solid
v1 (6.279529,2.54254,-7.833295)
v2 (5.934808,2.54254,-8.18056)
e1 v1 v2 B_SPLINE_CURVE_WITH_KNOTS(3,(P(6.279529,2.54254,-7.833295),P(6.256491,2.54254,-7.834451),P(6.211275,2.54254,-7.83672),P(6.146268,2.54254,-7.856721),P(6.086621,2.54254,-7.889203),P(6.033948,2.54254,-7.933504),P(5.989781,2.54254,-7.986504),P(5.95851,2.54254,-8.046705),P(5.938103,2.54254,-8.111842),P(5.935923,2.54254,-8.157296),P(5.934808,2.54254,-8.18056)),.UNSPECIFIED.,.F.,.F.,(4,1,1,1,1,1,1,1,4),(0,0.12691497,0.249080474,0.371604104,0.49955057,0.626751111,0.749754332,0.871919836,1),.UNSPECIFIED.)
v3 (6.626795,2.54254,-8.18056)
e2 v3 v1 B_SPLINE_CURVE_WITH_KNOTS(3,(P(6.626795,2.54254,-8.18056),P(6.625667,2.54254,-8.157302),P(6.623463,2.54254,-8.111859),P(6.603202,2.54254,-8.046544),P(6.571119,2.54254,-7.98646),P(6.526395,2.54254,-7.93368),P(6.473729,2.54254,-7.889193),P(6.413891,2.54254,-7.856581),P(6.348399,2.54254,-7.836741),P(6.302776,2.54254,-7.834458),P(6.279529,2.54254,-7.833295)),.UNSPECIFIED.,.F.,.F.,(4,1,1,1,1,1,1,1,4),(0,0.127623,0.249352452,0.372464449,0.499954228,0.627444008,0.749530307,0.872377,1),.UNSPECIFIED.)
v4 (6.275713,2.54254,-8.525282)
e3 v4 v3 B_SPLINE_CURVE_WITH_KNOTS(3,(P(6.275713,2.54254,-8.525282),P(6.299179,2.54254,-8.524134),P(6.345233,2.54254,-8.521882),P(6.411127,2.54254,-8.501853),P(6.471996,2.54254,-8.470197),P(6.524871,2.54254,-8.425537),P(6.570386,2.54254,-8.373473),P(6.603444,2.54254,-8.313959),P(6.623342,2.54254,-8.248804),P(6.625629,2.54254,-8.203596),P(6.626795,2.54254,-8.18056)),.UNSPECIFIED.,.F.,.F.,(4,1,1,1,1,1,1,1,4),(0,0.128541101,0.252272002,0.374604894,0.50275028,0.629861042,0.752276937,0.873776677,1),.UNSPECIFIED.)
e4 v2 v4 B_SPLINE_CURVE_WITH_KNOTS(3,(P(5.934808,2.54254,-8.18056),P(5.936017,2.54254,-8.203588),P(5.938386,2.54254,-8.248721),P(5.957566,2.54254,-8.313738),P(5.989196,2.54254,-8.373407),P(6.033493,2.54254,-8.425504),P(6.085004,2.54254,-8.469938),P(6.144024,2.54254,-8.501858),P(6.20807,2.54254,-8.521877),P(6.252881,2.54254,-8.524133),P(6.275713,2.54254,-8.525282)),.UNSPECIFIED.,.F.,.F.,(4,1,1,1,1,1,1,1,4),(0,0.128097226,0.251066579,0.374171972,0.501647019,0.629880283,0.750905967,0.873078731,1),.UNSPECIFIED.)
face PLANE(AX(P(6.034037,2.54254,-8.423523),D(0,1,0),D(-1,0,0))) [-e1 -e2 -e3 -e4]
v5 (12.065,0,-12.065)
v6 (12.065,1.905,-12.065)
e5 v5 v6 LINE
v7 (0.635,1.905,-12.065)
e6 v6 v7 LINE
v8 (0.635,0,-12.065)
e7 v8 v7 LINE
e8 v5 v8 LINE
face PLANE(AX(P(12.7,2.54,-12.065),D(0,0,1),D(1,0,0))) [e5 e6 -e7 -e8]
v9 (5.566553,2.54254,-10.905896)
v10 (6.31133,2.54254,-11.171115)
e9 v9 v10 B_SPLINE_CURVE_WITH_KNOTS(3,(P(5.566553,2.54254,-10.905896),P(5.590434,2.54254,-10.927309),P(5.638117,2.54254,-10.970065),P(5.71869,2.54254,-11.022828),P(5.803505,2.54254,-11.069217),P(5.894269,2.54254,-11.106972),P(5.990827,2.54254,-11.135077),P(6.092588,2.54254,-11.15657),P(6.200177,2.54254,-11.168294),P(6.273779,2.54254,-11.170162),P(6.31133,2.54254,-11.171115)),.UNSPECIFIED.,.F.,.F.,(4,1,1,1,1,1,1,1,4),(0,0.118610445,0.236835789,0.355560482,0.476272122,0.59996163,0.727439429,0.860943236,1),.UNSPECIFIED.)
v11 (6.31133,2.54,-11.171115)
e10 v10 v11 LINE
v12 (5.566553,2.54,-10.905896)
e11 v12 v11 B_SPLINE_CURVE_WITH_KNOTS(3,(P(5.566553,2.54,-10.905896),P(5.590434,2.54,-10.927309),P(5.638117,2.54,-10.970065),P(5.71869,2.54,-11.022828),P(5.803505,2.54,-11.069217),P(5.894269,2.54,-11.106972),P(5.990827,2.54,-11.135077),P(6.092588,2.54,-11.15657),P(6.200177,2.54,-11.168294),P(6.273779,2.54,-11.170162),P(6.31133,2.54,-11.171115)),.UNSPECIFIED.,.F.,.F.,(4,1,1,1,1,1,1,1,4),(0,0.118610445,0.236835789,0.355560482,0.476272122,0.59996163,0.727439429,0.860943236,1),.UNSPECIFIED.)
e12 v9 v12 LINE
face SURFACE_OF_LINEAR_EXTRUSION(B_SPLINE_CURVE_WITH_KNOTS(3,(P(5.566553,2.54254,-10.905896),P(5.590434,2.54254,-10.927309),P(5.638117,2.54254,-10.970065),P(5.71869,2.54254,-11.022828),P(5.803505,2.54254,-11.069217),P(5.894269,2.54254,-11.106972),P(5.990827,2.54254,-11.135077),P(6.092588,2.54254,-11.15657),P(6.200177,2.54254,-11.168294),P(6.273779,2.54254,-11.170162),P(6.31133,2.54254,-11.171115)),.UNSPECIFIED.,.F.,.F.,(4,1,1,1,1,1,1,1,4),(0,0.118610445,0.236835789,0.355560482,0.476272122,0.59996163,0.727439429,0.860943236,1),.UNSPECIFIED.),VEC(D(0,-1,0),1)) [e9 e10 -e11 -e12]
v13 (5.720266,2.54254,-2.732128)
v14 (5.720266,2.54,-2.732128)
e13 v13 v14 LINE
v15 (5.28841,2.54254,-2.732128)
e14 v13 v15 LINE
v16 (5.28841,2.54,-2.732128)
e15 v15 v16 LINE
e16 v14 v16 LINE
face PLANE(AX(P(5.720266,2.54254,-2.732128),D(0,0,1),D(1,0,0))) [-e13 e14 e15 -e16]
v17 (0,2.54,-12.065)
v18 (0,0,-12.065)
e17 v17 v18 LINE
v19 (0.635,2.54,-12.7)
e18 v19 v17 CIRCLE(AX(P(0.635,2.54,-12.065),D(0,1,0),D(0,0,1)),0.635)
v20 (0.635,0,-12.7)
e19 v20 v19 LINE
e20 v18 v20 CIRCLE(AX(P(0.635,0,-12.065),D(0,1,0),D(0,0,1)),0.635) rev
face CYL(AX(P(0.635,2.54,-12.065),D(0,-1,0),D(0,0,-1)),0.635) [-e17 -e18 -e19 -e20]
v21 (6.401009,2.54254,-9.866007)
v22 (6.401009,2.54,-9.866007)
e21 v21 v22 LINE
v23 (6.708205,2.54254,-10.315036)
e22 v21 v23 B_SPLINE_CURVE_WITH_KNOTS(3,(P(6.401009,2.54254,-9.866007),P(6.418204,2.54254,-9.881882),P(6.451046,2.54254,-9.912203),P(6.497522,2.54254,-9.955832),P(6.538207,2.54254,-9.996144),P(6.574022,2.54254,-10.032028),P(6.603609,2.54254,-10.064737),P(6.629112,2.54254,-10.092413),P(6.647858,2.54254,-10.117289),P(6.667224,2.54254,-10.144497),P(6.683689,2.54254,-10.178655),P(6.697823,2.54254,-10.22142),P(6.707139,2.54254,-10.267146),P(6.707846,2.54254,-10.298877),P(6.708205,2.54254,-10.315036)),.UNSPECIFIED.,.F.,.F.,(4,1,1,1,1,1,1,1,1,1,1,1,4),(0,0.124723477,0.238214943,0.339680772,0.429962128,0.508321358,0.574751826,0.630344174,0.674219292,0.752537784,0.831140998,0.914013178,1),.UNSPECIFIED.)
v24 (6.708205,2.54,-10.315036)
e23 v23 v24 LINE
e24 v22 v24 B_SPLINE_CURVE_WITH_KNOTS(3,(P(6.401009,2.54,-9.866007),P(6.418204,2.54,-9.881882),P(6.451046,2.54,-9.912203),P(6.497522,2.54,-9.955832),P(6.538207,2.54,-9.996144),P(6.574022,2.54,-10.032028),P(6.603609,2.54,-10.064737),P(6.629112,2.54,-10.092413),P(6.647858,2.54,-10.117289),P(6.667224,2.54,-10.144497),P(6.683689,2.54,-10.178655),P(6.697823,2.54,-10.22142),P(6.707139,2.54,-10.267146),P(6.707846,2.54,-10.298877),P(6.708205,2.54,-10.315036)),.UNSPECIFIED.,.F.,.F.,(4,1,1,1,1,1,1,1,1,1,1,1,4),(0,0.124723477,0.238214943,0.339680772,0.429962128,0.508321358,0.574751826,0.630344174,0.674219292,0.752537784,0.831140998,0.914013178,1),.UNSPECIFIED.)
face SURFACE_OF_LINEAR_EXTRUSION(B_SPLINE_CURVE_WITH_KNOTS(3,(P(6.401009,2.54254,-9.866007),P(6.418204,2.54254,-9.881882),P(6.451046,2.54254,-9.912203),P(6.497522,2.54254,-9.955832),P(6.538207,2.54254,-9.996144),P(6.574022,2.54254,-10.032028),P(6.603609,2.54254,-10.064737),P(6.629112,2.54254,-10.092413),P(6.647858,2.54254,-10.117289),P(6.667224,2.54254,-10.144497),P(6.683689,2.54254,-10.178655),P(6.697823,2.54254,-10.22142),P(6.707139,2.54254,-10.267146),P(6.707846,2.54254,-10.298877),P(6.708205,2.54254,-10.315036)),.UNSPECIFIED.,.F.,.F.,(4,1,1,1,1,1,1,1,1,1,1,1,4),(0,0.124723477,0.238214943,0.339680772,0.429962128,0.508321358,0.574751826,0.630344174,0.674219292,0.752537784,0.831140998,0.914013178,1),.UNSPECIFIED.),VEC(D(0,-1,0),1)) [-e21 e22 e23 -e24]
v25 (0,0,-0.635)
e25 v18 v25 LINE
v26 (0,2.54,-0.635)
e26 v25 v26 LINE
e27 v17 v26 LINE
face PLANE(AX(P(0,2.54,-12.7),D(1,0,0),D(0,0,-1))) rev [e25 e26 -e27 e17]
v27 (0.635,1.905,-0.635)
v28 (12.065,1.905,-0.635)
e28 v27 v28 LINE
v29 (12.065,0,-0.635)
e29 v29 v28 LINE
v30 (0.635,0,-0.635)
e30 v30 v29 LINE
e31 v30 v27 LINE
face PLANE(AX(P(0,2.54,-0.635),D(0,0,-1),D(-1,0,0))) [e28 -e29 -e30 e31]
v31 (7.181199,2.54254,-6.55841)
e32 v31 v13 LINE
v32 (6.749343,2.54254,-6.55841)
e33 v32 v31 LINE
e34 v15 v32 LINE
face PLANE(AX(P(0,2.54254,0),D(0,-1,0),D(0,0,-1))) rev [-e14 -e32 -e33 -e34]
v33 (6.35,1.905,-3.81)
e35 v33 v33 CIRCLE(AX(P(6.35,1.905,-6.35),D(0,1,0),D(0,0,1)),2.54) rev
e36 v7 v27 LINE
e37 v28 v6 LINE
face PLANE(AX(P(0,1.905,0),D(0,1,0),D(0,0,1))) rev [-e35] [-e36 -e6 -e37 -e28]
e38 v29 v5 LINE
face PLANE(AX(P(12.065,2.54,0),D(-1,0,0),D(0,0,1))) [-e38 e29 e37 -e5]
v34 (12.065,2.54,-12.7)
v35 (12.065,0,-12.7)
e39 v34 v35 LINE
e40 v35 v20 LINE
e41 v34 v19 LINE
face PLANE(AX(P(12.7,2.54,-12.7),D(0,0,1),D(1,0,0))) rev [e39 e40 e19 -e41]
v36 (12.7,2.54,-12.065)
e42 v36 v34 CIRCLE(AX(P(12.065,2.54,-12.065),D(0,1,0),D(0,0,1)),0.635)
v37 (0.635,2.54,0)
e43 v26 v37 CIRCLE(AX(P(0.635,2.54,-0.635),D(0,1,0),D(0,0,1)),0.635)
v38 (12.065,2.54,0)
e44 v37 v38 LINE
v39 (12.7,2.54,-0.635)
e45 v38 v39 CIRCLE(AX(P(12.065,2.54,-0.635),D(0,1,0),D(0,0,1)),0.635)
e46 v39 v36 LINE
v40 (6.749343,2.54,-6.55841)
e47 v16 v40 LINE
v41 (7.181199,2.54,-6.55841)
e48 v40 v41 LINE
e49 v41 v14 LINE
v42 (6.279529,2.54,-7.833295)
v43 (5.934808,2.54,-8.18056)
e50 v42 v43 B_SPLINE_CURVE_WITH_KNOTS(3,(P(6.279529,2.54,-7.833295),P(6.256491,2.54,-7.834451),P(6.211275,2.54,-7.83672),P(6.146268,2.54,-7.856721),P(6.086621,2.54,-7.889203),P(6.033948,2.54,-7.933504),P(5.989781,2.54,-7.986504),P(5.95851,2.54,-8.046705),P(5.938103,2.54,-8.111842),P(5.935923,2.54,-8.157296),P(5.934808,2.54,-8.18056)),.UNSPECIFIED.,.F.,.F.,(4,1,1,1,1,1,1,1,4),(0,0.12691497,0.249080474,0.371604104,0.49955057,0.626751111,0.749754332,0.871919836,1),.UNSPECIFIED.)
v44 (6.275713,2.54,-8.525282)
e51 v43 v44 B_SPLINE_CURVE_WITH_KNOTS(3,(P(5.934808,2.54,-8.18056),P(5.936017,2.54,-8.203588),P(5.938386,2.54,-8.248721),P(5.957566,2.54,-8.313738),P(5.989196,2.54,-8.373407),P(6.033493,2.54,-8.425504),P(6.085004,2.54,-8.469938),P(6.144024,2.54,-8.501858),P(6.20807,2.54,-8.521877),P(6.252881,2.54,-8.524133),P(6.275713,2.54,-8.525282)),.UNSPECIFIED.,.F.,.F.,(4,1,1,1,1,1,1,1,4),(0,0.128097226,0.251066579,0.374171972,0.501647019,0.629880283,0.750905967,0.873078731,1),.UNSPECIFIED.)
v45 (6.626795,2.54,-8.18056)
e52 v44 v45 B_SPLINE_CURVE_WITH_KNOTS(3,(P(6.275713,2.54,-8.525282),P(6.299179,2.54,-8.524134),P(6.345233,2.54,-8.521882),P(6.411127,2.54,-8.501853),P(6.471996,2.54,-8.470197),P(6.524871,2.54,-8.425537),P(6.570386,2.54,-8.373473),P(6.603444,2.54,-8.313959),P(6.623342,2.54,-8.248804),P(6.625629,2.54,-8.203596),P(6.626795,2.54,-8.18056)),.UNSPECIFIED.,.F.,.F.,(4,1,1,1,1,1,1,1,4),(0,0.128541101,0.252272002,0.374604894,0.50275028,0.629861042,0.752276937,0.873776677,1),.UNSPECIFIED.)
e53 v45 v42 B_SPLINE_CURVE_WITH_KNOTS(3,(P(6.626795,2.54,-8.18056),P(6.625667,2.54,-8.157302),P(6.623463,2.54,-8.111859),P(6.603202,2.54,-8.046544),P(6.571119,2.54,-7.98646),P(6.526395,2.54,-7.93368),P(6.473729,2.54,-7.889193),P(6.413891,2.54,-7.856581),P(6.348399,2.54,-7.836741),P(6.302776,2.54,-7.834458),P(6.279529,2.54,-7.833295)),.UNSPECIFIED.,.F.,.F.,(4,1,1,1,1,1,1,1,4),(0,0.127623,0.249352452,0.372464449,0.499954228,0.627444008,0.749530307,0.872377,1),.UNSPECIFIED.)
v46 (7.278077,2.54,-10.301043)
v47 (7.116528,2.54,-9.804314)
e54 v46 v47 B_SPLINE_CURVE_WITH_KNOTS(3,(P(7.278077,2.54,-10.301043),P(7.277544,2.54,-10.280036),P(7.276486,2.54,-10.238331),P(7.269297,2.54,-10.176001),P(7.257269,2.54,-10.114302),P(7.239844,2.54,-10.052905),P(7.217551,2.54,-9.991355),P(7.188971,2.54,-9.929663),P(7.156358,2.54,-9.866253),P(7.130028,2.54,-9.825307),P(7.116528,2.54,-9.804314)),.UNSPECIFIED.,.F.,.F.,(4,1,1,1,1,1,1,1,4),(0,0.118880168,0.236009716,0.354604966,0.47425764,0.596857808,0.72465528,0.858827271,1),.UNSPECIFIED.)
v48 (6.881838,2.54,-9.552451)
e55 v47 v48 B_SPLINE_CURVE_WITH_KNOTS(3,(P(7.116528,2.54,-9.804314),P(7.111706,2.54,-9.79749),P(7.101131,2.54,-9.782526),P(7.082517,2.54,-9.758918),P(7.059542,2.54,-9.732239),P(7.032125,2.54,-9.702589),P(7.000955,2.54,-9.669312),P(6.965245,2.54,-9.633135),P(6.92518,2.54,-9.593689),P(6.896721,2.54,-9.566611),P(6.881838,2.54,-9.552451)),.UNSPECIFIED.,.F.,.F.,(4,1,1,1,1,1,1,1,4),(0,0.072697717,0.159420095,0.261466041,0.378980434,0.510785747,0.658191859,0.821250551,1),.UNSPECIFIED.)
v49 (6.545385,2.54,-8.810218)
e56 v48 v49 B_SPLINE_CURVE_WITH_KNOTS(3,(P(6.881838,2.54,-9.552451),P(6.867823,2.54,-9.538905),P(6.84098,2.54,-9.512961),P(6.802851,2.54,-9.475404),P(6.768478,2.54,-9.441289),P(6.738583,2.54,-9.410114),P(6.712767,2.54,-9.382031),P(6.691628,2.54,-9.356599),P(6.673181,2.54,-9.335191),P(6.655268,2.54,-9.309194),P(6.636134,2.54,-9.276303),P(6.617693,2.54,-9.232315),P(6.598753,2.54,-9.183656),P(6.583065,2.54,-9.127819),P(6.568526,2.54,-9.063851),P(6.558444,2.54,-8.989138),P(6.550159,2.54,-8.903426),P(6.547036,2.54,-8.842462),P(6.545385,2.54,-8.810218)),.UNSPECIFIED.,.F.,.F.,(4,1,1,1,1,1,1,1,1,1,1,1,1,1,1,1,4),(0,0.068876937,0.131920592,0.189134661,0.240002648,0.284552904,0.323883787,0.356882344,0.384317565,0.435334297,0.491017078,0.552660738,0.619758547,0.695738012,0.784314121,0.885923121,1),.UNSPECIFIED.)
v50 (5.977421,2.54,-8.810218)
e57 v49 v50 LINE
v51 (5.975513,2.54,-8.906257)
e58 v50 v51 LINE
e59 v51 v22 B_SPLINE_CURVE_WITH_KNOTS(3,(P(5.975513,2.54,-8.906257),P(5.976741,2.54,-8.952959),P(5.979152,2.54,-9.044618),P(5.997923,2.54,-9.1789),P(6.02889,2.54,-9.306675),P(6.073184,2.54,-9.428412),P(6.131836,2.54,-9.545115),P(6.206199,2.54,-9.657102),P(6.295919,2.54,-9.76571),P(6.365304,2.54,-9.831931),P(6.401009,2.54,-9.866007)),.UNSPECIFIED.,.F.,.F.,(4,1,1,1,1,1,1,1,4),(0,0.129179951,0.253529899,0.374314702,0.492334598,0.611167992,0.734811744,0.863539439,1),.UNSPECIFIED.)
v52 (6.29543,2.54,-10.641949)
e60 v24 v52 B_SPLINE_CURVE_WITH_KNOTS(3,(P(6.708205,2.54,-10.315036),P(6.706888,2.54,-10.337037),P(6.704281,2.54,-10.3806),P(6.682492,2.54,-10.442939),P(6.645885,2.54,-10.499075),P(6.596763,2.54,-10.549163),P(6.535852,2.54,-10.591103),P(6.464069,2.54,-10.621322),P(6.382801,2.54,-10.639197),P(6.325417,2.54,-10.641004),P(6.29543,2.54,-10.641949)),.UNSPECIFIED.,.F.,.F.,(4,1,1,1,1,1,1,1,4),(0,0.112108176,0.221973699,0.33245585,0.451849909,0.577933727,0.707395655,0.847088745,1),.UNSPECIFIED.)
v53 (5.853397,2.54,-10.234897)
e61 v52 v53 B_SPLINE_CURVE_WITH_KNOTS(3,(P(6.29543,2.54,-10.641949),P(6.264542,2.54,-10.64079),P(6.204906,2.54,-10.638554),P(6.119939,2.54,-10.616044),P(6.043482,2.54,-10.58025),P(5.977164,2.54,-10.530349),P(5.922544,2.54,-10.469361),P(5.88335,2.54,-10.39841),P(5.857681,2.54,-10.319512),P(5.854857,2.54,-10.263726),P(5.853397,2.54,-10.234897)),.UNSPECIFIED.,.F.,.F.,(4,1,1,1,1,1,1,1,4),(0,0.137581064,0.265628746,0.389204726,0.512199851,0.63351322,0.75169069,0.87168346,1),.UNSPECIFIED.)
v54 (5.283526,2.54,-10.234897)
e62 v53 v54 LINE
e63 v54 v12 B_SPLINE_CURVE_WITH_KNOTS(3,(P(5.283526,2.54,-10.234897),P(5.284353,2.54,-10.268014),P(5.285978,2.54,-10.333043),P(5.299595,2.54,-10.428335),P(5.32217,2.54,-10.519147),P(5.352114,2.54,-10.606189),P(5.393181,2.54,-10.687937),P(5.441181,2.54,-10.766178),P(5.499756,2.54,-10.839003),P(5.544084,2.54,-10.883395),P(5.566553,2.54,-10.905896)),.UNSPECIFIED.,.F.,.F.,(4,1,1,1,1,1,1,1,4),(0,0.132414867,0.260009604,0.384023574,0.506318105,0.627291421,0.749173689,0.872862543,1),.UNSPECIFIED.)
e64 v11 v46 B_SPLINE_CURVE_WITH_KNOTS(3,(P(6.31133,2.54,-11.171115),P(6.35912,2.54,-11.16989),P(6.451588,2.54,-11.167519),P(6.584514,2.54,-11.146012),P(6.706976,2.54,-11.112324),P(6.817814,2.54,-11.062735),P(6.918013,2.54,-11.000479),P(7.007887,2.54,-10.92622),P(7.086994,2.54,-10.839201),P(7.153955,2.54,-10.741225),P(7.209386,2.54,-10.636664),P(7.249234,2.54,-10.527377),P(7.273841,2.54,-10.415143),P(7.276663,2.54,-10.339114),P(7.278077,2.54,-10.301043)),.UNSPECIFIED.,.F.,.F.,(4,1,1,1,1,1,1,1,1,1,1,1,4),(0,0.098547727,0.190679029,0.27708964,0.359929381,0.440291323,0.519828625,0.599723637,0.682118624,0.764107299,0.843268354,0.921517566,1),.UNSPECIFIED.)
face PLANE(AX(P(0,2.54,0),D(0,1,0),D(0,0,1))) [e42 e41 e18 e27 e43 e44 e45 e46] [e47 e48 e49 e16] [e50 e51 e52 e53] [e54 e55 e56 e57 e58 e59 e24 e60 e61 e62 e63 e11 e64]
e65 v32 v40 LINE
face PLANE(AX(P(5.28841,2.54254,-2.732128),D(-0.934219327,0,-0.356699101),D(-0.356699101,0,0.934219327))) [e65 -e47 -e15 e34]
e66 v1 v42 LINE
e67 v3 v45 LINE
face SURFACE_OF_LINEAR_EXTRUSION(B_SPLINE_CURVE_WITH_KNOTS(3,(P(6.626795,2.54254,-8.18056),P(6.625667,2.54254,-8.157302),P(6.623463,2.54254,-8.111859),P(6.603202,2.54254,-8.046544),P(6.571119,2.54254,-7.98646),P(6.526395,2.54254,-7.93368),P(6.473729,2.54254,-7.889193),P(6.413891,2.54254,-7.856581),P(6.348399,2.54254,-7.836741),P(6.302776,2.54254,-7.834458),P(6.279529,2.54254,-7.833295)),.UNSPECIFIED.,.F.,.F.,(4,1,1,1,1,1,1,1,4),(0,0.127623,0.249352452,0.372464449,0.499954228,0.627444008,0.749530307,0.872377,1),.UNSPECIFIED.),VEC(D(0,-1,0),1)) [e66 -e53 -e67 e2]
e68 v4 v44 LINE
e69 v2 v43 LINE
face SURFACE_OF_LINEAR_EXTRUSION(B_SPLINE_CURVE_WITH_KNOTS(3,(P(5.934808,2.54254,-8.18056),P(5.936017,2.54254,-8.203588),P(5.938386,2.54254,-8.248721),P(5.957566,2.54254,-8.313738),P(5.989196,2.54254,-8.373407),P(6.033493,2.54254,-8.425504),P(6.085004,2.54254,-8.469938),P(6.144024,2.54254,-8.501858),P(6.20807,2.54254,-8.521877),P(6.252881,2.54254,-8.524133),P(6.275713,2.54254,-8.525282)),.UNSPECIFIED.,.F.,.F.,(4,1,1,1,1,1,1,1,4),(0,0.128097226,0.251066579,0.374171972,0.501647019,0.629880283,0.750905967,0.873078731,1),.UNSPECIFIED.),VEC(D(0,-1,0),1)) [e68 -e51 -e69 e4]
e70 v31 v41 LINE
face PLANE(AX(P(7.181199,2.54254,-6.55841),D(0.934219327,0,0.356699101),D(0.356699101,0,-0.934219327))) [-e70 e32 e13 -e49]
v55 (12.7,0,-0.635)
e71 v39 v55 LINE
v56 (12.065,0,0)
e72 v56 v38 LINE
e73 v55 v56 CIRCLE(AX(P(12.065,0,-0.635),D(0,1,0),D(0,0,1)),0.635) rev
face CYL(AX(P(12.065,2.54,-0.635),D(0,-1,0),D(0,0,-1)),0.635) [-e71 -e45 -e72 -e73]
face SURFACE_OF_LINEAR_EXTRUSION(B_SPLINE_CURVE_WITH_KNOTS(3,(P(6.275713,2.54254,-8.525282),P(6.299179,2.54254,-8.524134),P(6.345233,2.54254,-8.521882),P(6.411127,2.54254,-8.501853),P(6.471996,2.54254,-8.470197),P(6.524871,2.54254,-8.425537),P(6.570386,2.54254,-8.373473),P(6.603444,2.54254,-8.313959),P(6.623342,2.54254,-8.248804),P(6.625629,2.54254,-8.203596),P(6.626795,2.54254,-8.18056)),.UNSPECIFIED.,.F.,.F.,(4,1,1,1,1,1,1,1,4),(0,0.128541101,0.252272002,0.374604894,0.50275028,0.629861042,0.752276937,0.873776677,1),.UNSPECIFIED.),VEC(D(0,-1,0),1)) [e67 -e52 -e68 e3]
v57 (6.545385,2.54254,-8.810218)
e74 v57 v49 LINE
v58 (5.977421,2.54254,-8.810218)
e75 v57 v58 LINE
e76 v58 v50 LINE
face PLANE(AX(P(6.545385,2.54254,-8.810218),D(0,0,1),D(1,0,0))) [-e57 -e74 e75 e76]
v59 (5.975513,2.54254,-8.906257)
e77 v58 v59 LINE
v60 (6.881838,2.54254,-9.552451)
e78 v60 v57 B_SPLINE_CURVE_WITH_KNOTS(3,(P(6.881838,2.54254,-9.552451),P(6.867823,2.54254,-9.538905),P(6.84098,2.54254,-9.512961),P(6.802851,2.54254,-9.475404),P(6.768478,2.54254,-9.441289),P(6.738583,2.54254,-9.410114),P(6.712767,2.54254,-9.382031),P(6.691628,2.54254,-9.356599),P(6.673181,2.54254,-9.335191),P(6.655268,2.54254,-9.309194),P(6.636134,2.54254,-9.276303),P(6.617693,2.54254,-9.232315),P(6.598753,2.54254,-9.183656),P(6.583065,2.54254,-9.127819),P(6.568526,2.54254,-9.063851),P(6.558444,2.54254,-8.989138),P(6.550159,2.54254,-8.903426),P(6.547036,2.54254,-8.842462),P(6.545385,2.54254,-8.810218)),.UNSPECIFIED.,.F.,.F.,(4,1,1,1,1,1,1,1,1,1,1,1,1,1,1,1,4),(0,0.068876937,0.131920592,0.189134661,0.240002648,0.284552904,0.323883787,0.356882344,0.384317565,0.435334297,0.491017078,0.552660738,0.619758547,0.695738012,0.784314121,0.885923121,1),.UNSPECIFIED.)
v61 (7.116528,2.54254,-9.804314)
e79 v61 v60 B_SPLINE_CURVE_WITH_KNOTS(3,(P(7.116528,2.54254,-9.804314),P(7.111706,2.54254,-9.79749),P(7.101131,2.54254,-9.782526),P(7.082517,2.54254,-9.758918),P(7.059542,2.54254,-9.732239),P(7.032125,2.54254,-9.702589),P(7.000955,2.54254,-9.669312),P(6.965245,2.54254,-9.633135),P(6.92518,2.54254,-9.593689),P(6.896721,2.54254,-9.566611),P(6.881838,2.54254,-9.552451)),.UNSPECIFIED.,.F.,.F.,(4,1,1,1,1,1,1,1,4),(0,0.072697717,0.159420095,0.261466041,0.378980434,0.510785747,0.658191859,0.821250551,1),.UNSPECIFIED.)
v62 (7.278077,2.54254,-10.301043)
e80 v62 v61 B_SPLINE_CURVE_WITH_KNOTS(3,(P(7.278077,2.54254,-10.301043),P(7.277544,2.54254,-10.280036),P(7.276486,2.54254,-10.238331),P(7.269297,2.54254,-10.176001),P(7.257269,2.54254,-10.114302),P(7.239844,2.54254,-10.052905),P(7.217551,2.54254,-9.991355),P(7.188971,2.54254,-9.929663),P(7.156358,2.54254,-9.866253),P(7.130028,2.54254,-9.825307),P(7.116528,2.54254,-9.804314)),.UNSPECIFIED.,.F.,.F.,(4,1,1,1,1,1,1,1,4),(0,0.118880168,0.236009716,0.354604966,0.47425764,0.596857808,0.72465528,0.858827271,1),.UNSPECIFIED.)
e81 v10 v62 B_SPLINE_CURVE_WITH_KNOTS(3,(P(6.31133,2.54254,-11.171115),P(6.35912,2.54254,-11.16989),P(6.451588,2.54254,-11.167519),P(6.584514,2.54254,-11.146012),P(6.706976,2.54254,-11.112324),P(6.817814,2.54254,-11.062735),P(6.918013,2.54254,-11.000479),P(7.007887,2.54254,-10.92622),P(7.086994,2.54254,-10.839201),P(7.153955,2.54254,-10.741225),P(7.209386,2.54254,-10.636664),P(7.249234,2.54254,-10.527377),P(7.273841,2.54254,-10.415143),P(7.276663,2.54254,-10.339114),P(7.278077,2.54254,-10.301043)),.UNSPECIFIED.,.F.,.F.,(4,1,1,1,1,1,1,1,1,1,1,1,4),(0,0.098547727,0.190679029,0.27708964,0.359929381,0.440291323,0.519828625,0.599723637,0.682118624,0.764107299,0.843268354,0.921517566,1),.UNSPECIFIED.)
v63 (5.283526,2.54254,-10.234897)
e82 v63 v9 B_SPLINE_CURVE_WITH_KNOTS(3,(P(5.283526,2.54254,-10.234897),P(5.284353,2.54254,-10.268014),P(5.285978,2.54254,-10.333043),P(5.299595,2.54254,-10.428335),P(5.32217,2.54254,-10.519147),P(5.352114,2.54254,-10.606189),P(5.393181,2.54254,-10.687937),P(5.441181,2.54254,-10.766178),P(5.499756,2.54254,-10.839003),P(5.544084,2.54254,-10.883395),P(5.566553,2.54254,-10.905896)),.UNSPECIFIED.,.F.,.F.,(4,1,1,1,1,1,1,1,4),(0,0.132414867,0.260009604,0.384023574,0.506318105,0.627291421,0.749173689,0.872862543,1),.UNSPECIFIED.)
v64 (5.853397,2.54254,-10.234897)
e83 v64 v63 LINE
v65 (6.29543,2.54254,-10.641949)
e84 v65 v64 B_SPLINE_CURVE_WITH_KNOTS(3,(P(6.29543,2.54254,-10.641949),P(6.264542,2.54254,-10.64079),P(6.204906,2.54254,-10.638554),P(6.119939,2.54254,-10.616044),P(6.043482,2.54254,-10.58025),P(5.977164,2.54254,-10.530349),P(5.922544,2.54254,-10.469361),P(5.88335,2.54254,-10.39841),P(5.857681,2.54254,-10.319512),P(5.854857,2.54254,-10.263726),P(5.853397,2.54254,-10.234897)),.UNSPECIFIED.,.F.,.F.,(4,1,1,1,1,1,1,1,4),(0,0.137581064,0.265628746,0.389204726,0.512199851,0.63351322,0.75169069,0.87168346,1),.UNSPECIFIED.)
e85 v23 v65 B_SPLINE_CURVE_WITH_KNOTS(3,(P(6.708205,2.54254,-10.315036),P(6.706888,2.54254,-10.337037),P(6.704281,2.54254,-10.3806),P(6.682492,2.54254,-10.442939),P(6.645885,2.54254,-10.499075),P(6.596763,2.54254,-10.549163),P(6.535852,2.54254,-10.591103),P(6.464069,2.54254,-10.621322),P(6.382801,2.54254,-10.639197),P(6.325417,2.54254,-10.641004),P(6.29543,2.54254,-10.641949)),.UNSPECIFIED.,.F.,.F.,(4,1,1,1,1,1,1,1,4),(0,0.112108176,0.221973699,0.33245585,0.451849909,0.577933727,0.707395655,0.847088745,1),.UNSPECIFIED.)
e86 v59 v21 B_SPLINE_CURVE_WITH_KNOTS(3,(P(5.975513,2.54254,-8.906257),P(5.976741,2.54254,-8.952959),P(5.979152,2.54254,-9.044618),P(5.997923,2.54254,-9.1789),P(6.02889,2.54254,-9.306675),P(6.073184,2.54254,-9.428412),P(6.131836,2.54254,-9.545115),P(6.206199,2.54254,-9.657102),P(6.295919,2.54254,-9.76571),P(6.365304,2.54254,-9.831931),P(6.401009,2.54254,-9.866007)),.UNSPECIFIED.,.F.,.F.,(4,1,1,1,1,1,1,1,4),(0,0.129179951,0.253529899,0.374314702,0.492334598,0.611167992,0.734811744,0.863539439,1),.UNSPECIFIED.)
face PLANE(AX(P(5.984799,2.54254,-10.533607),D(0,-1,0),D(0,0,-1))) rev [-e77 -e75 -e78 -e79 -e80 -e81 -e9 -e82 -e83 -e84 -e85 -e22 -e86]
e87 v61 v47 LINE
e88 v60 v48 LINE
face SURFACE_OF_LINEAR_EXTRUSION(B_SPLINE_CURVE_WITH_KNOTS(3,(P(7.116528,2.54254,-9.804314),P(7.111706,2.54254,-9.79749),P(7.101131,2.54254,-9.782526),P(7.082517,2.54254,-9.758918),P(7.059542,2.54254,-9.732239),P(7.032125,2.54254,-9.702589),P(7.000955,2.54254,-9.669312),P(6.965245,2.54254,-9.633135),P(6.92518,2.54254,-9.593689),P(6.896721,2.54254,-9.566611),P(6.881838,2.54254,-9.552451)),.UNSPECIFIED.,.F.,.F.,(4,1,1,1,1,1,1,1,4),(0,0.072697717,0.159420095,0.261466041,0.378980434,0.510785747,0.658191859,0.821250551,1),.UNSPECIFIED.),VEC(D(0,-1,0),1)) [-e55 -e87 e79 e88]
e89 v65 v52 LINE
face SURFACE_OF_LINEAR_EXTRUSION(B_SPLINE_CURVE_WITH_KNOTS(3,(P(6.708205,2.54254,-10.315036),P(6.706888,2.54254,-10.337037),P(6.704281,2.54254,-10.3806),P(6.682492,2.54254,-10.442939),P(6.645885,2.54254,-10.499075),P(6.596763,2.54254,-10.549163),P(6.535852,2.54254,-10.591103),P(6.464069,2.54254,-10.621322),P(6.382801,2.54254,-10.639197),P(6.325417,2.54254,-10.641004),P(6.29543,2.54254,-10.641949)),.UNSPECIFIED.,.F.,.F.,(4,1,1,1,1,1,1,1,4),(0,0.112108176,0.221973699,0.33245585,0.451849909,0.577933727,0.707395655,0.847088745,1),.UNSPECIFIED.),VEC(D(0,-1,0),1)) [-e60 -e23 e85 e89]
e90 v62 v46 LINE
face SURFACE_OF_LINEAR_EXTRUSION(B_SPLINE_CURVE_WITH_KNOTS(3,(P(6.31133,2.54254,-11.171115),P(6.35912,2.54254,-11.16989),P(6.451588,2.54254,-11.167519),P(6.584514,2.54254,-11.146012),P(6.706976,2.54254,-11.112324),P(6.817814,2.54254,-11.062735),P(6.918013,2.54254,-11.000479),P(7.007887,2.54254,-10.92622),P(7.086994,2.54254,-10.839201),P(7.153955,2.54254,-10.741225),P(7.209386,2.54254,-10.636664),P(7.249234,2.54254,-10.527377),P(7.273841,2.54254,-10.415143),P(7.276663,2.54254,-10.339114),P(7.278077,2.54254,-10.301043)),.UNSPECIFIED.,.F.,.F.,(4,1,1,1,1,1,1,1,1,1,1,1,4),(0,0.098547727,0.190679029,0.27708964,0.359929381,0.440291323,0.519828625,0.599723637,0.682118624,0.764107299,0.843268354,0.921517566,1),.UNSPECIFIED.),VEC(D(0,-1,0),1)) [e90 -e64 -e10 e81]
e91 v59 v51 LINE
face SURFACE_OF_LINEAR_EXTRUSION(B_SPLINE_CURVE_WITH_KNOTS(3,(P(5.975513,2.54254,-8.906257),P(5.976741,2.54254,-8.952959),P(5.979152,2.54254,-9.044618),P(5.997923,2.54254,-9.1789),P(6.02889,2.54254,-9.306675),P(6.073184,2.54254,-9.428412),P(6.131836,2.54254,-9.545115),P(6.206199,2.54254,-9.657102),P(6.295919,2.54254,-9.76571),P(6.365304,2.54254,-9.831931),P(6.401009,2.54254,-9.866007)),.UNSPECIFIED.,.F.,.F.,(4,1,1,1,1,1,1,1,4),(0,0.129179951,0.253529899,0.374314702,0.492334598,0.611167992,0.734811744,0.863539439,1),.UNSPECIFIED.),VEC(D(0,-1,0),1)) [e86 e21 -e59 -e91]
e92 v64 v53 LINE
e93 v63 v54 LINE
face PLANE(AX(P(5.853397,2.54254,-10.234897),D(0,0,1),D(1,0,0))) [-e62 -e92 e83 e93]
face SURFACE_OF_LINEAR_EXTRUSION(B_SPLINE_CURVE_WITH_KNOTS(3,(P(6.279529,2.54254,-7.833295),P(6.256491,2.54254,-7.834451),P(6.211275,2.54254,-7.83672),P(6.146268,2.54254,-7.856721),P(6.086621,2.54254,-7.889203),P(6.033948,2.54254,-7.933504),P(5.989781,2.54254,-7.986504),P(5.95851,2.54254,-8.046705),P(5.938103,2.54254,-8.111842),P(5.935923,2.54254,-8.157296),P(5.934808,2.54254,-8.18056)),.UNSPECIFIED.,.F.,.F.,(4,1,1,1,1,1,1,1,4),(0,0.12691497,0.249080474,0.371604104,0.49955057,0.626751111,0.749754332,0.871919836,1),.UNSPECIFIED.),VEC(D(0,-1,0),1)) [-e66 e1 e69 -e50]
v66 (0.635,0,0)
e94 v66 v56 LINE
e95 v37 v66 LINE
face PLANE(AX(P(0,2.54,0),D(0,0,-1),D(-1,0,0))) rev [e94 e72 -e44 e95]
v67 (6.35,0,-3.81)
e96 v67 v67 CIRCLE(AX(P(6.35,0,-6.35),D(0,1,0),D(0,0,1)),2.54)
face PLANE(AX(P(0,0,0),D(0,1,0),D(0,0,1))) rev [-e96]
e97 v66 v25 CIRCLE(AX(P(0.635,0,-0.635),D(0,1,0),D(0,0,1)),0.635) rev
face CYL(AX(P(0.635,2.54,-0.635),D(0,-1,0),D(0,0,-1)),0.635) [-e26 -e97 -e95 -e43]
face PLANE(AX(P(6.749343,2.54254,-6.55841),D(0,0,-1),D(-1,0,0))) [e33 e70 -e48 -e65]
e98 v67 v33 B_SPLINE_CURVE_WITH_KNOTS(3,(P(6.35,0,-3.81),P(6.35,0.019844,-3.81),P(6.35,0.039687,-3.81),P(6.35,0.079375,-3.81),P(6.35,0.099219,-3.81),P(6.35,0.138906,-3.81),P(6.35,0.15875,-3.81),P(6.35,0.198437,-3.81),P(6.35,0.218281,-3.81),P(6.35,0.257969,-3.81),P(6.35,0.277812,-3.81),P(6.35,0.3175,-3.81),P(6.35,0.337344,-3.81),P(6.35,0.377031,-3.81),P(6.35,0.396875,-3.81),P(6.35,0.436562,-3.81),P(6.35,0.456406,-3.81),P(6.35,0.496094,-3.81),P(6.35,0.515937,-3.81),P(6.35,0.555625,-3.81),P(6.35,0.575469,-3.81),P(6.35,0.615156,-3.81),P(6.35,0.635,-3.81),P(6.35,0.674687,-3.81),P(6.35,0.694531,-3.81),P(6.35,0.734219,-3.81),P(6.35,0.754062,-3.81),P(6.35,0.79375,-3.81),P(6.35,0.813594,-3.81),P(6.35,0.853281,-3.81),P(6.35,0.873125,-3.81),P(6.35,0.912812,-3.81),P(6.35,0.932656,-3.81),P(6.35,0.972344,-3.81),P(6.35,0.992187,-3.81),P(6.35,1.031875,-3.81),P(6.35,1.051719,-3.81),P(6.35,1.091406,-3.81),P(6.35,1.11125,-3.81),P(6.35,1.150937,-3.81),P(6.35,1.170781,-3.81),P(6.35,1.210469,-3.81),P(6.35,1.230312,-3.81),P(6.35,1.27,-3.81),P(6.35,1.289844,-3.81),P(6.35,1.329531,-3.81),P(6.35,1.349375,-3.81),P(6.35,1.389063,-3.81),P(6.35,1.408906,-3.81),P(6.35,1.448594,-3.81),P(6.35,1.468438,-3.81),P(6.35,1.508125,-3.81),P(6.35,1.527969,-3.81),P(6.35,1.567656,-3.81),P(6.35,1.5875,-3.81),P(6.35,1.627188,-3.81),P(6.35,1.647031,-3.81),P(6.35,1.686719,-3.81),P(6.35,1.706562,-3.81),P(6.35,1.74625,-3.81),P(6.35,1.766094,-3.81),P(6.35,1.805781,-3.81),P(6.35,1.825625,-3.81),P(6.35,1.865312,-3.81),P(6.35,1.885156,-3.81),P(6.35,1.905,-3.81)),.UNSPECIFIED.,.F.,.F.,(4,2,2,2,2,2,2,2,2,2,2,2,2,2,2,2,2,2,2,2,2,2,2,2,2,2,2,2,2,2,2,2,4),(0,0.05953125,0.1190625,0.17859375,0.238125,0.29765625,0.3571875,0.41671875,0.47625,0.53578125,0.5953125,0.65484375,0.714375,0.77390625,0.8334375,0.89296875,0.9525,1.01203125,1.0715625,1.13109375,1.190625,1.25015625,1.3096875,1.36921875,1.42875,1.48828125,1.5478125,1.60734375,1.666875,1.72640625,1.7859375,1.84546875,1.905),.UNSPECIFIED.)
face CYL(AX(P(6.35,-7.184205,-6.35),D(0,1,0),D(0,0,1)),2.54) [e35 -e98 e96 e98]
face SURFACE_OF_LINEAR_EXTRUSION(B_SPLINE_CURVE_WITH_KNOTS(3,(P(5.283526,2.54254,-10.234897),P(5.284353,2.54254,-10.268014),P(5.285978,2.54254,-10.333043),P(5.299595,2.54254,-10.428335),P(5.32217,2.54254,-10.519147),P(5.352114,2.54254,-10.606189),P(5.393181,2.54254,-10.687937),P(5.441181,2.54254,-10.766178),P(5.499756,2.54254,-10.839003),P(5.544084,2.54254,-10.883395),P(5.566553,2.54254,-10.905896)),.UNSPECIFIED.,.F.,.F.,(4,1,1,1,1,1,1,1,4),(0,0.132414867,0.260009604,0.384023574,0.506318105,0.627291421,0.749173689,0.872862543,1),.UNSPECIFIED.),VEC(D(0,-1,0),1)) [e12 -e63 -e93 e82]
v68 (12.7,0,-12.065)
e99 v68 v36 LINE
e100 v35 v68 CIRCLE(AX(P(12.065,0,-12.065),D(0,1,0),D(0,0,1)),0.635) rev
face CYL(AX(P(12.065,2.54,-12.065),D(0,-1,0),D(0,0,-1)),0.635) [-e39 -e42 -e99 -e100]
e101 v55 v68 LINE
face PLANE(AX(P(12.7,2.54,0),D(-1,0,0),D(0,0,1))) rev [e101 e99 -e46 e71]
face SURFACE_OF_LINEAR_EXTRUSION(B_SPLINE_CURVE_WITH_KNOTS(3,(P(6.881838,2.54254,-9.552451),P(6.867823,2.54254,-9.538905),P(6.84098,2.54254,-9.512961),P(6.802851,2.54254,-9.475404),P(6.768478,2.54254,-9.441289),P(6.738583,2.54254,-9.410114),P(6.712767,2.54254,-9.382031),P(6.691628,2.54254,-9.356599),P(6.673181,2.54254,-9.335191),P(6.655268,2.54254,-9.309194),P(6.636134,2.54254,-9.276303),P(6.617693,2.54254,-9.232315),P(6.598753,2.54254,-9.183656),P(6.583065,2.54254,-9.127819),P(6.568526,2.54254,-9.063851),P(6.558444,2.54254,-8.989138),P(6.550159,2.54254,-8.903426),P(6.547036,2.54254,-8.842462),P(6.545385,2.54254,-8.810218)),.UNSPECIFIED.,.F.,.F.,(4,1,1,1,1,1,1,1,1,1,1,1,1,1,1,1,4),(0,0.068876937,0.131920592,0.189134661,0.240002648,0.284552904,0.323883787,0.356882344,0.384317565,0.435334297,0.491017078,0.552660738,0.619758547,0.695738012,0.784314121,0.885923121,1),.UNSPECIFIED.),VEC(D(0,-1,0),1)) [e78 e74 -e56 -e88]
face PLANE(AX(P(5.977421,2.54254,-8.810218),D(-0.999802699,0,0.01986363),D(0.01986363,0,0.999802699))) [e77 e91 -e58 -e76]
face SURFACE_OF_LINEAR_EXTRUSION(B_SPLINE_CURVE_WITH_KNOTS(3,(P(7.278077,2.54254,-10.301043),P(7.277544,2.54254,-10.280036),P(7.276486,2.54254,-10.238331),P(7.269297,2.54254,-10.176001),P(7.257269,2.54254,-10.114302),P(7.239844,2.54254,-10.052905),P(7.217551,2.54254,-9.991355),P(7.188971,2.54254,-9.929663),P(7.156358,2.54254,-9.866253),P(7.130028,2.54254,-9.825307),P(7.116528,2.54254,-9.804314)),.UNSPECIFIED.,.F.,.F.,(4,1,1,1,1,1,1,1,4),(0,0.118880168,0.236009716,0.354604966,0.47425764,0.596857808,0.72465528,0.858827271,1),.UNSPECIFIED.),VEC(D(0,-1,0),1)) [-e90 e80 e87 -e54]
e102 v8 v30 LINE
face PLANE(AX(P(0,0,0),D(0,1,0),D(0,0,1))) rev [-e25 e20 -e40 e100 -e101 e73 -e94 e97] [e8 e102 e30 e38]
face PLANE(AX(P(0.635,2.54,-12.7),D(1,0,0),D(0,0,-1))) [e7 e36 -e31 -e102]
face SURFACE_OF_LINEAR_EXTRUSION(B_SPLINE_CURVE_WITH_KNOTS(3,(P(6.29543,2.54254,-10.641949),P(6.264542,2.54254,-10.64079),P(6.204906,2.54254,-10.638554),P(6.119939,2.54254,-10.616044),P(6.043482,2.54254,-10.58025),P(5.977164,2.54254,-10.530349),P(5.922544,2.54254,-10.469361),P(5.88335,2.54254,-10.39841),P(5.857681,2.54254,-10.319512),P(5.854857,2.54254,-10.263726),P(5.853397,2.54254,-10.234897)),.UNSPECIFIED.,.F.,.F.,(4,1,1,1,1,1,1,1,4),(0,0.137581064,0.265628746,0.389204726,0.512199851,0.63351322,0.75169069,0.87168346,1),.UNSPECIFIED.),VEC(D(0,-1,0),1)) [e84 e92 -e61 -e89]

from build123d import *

# Parameters (mm, degrees)
SKETCH1_W           = 12.7
SKETCH1_H           = 12.7
BOSS_EXTRUDE1_DEPTH = 2.54
FILLET1_R           = 0.635
SHELL1_START        = 0.635
SHELL1_OUTLINE_W    = 1.905
SHELL1_OUTLINE_H    = 11.43
SHELL1_DEPTH        = 11.43
SKETCH2_R           = 2.54
BOSS_EXTRUDE2_DEPTH = 1.905
BOSS_EXTRUDE3_DEPTH = 0.00254


# Read off the part's stored shape, not the designer's step: Shell1
with BuildPart() as part:
    # Sketch1 → Boss-Extrude1 (new body)
    with BuildSketch(Plane(origin=(0, 0, 0), x_dir=(1, 0, 0), z_dir=(0, 1, 0))):
        with Locations((6.35, 6.35)):
            Rectangle(SKETCH1_W, SKETCH1_H)
    extrude(amount=BOSS_EXTRUDE1_DEPTH)

    # Fillet1
    fillet1_edges = [part.edges().sort_by_distance(p)[0] for p in [
        (0, 1.27, -12.7),
        (12.7, 1.27, -12.7),
        (12.7, 1.27, 0),
        (0, 1.27, 0),
    ]]
    fillet(fillet1_edges, radius=FILLET1_R)

    # Shell1 outline → Shell1 (cut)
    with BuildSketch(Plane.YZ.offset(SHELL1_START)):
        with Locations((0.9525, -6.35)):
            Rectangle(SHELL1_OUTLINE_W, SHELL1_OUTLINE_H)
    extrude(amount=SHELL1_DEPTH, mode=Mode.SUBTRACT)

    # Sketch2 → Boss-Extrude2 (add)
    with BuildSketch(Plane(origin=(0, 1.905, 0), x_dir=(-1, 0, 0), z_dir=(0, -1, 0))):
        with Locations(Location((-6.35, 6.35, 0), (0, 0, 270))):
            Circle(SKETCH2_R)
    extrude(amount=BOSS_EXTRUDE2_DEPTH)

    # Sketch3 → Boss-Extrude3 (add)
    with BuildSketch(Plane(origin=(0, 2.54, 0), x_dir=(1, 0, 0), z_dir=(0, 1, 0))):
        with BuildLine():
            Line((5.853397436, 10.234897436), (5.283525641, 10.234897436))
            add(Edge.make_bspline(
                [(5.283525641, 10.234897436), (5.284353116, 10.268014374), (5.285977943, 10.333042737), (5.299594671, 10.4283349), (5.322170454, 10.519147471), (5.352113733, 10.606188577), (5.393180841, 10.687937495), (5.441181448, 10.76617845), (5.499755897, 10.839002803), (5.544084465, 10.883394842), (5.566553486, 10.905896034)],
                knots=[0, 0, 0, 0, 1.059318936, 2.080076833, 3.072188589, 4.050544838, 5.018331365, 5.993389509, 6.98290034, 8, 8, 8, 8], degree=3))
            add(Edge.make_bspline(
                [(5.566553486, 10.905896034), (5.590433678, 10.927308972), (5.638116529, 10.970065325), (5.718689808, 11.022828021), (5.803504931, 11.06921666), (5.894268619, 11.106972474), (5.990827059, 11.135076524), (6.092587635, 11.156569797), (6.200177048, 11.168294409), (6.273779262, 11.170162374), (6.311330128, 11.171115385)],
                knots=[0, 0, 0, 0, 0.948883556, 1.894686314, 2.844483856, 3.810176973, 4.799693044, 5.819515431, 6.887545887, 8, 8, 8, 8], degree=3))
            add(Edge.make_bspline(
                [(6.311330128, 11.171115385), (6.359120103, 11.169889945), (6.451588454, 11.167518855), (6.584514069, 11.146011833), (6.706975805, 11.112324433), (6.817814436, 11.062735489), (6.918012523, 11.000478686), (7.007887309, 10.926220415), (7.086994083, 10.839200529), (7.15395512, 10.741225072), (7.209386328, 10.636664029), (7.249233878, 10.527377386), (7.273840561, 10.415142851), (7.276663402, 10.339114174), (7.278076923, 10.301043269)],
                knots=[0, 0, 0, 0, 1.182572727, 2.288148342, 3.325075675, 4.319152577, 5.283495877, 6.237943501, 7.196683647, 8.185423483, 9.169287591, 10.119220246, 11.058210795, 12, 12, 12, 12], degree=3))
            add(Edge.make_bspline(
                [(7.278076923, 10.301043269), (7.277544158, 10.280036013), (7.276486473, 10.238330852), (7.269296582, 10.176000543), (7.257269416, 10.114301607), (7.239843882, 10.052905415), (7.217550967, 9.991355497), (7.188970888, 9.929663399), (7.156358228, 9.866252998), (7.13002819, 9.825307022), (7.116528446, 9.804313502)],
                knots=[0, 0, 0, 0, 0.951041345, 1.888077725, 2.83683973, 3.794061122, 4.774862461, 5.797242242, 6.870618167, 8, 8, 8, 8], degree=3))
            add(Edge.make_bspline(
                [(7.116528446, 9.804313502), (7.111705931, 9.797489865), (7.101130556, 9.782526193), (7.082517064, 9.75891757), (7.059541503, 9.732239397), (7.032124964, 9.702588546), (7.000954688, 9.669311823), (6.965245373, 9.633134756), (6.925180303, 9.593688673), (6.896720873, 9.566610908), (6.881837941, 9.552450521)],
                knots=[0, 0, 0, 0, 0.581581733, 1.275360758, 2.091728324, 3.031843472, 4.086285973, 5.265534873, 6.570004409, 8, 8, 8, 8], degree=3))
            add(Edge.make_bspline(
                [(6.881837941, 9.552450521), (6.867823063, 9.538905104), (6.840980246, 9.512961451), (6.802850531, 9.475403757), (6.768477971, 9.441288703), (6.738583417, 9.410113726), (6.712767428, 9.382030868), (6.691628482, 9.356598526), (6.673181109, 9.335190758), (6.655268183, 9.309193967), (6.636134141, 9.27630329), (6.617692661, 9.232315394), (6.598752582, 9.183656029), (6.583064675, 9.127819109), (6.568525728, 9.063850691), (6.558444173, 8.98913819), (6.550158775, 8.903425503), (6.54703617, 8.842461817), (6.545384615, 8.810217949)],
                knots=[0, 0, 0, 0, 1.102030995, 2.110729467, 3.026154581, 3.840042361, 4.552846469, 5.182140586, 5.710117496, 6.149081041, 6.965348744, 7.856273241, 8.842571802, 9.916136751, 11.13180819, 12.549025941, 14.174769928, 16, 16, 16, 16], degree=3))
            Line((6.545384615, 8.810217949), (5.977420873, 8.810217949))
            Line((5.977420873, 8.810217949), (5.975512821, 8.906256611))
            add(Edge.make_bspline(
                [(5.975512821, 8.906256611), (5.976741281, 8.952959078), (5.97915227, 9.04461782), (5.997923184, 9.17890025), (6.028889585, 9.306674594), (6.073183888, 9.428411842), (6.13183631, 9.545115416), (6.206199488, 9.657101789), (6.295918801, 9.765710318), (6.365304252, 9.831931248), (6.401008614, 9.866007212)],
                knots=[0, 0, 0, 0, 1.033439605, 2.028239196, 2.994517618, 3.938676781, 4.889343937, 5.878493955, 6.908315515, 8, 8, 8, 8], degree=3))
            add(Edge.make_bspline(
                [(6.401008614, 9.866007212), (6.418203829, 9.881882491), (6.451045739, 9.912203398), (6.497521564, 9.955831899), (6.538207001, 9.996143513), (6.574021852, 10.032027952), (6.60360938, 10.064736512), (6.629111702, 10.092412527), (6.647857862, 10.117289473), (6.667224093, 10.144496763), (6.683688858, 10.178654576), (6.697823373, 10.221420023), (6.707139354, 10.267146407), (6.707845528, 10.298877478), (6.708205128, 10.315035657)],
                knots=[0, 0, 0, 0, 1.496681724, 2.858579316, 4.076169266, 5.159545538, 6.0998563, 6.897021917, 7.564130093, 8.090631505, 9.030453413, 9.97369198, 10.968158133, 12, 12, 12, 12], degree=3))
            add(Edge.make_bspline(
                [(6.708205128, 10.315035657), (6.706888341, 10.337037285), (6.704281107, 10.380600413), (6.682492098, 10.442939177), (6.645885475, 10.499075222), (6.596763053, 10.549162809), (6.535851582, 10.591103493), (6.464068799, 10.621322106), (6.382800734, 10.639196819), (6.325417451, 10.641004203), (6.295429687, 10.641948718)],
                knots=[0, 0, 0, 0, 0.89686541, 1.775789589, 2.659646804, 3.614799273, 4.623469819, 5.659165238, 6.776709961, 8, 8, 8, 8], degree=3))
            add(Edge.make_bspline(
                [(6.295429687, 10.641948718), (6.264541595, 10.640790498), (6.204905733, 10.638554313), (6.119938634, 10.616043899), (6.04348174, 10.580249645), (5.977164014, 10.530348621), (5.922544381, 10.469360961), (5.883350326, 10.398410103), (5.85768066, 10.319511854), (5.854856732, 10.263725594), (5.853397436, 10.234897436)],
                knots=[0, 0, 0, 0, 1.100648509, 2.125029966, 3.113637804, 4.097598811, 5.068105762, 6.013525516, 6.973467682, 8, 8, 8, 8], degree=3))
        make_face()
        with BuildLine():
            add(Edge.make_bspline(
                [(6.275713141, 8.525282051), (6.299179014, 8.524134389), (6.345232632, 8.521882012), (6.411126908, 8.501852518), (6.471995891, 8.470197401), (6.524870844, 8.425537098), (6.570385609, 8.37347305), (6.603443799, 8.313958987), (6.623341923, 8.248804438), (6.62562935, 8.203595823), (6.626794872, 8.180560497)],
                knots=[0, 0, 0, 0, 1.02832881, 2.018176019, 2.996839149, 4.02200224, 5.038888337, 6.018215493, 6.990213417, 8, 8, 8, 8], degree=3))
            add(Edge.make_bspline(
                [(6.626794872, 8.180560497), (6.625666727, 8.157301936), (6.623462536, 8.11185888), (6.603201866, 8.046543983), (6.571118549, 7.986459509), (6.526395492, 7.933679904), (6.473728692, 7.88919342), (6.413890891, 7.85658064), (6.348398585, 7.836741414), (6.302775693, 7.834458232), (6.279529247, 7.833294872)],
                knots=[0, 0, 0, 0, 1.020984004, 1.994819617, 2.979715589, 3.999633825, 5.019552061, 5.996242457, 6.979015996, 8, 8, 8, 8], degree=3))
            add(Edge.make_bspline(
                [(6.279529247, 7.833294872), (6.25649052, 7.834451139), (6.211275231, 7.836720402), (6.14626792, 7.856720874), (6.086621496, 7.889203344), (6.03394775, 7.933503713), (5.989781247, 7.986503553), (5.958510337, 8.046704841), (5.938103298, 8.111841812), (5.935923402, 8.157296158), (5.934807692, 8.180560497)],
                knots=[0, 0, 0, 0, 1.015319757, 1.992643789, 2.97283283, 3.99640456, 5.014008891, 5.998034653, 6.975358685, 8, 8, 8, 8], degree=3))
            add(Edge.make_bspline(
                [(5.934807692, 8.180560497), (5.93601664, 8.203587923), (5.938386138, 8.248720962), (5.957566002, 8.313737697), (5.989195997, 8.373406988), (6.033493364, 8.425503873), (6.085003898, 8.469937879), (6.144023925, 8.50185823), (6.208070436, 8.521877137), (6.252880831, 8.524132747), (6.275713141, 8.525282051)],
                knots=[0, 0, 0, 0, 1.024777805, 2.008532629, 2.993375778, 4.013176149, 5.039042267, 6.007247738, 6.984629846, 8, 8, 8, 8], degree=3))
        make_face()
        Polygon((5.288410256, 2.732128205), (6.749342748, 6.558410256), (7.181198718, 6.558410256), (5.720266226, 2.732128205), align=None)
    extrude(amount=BOSS_EXTRUDE3_DEPTH)


solid = part.part
